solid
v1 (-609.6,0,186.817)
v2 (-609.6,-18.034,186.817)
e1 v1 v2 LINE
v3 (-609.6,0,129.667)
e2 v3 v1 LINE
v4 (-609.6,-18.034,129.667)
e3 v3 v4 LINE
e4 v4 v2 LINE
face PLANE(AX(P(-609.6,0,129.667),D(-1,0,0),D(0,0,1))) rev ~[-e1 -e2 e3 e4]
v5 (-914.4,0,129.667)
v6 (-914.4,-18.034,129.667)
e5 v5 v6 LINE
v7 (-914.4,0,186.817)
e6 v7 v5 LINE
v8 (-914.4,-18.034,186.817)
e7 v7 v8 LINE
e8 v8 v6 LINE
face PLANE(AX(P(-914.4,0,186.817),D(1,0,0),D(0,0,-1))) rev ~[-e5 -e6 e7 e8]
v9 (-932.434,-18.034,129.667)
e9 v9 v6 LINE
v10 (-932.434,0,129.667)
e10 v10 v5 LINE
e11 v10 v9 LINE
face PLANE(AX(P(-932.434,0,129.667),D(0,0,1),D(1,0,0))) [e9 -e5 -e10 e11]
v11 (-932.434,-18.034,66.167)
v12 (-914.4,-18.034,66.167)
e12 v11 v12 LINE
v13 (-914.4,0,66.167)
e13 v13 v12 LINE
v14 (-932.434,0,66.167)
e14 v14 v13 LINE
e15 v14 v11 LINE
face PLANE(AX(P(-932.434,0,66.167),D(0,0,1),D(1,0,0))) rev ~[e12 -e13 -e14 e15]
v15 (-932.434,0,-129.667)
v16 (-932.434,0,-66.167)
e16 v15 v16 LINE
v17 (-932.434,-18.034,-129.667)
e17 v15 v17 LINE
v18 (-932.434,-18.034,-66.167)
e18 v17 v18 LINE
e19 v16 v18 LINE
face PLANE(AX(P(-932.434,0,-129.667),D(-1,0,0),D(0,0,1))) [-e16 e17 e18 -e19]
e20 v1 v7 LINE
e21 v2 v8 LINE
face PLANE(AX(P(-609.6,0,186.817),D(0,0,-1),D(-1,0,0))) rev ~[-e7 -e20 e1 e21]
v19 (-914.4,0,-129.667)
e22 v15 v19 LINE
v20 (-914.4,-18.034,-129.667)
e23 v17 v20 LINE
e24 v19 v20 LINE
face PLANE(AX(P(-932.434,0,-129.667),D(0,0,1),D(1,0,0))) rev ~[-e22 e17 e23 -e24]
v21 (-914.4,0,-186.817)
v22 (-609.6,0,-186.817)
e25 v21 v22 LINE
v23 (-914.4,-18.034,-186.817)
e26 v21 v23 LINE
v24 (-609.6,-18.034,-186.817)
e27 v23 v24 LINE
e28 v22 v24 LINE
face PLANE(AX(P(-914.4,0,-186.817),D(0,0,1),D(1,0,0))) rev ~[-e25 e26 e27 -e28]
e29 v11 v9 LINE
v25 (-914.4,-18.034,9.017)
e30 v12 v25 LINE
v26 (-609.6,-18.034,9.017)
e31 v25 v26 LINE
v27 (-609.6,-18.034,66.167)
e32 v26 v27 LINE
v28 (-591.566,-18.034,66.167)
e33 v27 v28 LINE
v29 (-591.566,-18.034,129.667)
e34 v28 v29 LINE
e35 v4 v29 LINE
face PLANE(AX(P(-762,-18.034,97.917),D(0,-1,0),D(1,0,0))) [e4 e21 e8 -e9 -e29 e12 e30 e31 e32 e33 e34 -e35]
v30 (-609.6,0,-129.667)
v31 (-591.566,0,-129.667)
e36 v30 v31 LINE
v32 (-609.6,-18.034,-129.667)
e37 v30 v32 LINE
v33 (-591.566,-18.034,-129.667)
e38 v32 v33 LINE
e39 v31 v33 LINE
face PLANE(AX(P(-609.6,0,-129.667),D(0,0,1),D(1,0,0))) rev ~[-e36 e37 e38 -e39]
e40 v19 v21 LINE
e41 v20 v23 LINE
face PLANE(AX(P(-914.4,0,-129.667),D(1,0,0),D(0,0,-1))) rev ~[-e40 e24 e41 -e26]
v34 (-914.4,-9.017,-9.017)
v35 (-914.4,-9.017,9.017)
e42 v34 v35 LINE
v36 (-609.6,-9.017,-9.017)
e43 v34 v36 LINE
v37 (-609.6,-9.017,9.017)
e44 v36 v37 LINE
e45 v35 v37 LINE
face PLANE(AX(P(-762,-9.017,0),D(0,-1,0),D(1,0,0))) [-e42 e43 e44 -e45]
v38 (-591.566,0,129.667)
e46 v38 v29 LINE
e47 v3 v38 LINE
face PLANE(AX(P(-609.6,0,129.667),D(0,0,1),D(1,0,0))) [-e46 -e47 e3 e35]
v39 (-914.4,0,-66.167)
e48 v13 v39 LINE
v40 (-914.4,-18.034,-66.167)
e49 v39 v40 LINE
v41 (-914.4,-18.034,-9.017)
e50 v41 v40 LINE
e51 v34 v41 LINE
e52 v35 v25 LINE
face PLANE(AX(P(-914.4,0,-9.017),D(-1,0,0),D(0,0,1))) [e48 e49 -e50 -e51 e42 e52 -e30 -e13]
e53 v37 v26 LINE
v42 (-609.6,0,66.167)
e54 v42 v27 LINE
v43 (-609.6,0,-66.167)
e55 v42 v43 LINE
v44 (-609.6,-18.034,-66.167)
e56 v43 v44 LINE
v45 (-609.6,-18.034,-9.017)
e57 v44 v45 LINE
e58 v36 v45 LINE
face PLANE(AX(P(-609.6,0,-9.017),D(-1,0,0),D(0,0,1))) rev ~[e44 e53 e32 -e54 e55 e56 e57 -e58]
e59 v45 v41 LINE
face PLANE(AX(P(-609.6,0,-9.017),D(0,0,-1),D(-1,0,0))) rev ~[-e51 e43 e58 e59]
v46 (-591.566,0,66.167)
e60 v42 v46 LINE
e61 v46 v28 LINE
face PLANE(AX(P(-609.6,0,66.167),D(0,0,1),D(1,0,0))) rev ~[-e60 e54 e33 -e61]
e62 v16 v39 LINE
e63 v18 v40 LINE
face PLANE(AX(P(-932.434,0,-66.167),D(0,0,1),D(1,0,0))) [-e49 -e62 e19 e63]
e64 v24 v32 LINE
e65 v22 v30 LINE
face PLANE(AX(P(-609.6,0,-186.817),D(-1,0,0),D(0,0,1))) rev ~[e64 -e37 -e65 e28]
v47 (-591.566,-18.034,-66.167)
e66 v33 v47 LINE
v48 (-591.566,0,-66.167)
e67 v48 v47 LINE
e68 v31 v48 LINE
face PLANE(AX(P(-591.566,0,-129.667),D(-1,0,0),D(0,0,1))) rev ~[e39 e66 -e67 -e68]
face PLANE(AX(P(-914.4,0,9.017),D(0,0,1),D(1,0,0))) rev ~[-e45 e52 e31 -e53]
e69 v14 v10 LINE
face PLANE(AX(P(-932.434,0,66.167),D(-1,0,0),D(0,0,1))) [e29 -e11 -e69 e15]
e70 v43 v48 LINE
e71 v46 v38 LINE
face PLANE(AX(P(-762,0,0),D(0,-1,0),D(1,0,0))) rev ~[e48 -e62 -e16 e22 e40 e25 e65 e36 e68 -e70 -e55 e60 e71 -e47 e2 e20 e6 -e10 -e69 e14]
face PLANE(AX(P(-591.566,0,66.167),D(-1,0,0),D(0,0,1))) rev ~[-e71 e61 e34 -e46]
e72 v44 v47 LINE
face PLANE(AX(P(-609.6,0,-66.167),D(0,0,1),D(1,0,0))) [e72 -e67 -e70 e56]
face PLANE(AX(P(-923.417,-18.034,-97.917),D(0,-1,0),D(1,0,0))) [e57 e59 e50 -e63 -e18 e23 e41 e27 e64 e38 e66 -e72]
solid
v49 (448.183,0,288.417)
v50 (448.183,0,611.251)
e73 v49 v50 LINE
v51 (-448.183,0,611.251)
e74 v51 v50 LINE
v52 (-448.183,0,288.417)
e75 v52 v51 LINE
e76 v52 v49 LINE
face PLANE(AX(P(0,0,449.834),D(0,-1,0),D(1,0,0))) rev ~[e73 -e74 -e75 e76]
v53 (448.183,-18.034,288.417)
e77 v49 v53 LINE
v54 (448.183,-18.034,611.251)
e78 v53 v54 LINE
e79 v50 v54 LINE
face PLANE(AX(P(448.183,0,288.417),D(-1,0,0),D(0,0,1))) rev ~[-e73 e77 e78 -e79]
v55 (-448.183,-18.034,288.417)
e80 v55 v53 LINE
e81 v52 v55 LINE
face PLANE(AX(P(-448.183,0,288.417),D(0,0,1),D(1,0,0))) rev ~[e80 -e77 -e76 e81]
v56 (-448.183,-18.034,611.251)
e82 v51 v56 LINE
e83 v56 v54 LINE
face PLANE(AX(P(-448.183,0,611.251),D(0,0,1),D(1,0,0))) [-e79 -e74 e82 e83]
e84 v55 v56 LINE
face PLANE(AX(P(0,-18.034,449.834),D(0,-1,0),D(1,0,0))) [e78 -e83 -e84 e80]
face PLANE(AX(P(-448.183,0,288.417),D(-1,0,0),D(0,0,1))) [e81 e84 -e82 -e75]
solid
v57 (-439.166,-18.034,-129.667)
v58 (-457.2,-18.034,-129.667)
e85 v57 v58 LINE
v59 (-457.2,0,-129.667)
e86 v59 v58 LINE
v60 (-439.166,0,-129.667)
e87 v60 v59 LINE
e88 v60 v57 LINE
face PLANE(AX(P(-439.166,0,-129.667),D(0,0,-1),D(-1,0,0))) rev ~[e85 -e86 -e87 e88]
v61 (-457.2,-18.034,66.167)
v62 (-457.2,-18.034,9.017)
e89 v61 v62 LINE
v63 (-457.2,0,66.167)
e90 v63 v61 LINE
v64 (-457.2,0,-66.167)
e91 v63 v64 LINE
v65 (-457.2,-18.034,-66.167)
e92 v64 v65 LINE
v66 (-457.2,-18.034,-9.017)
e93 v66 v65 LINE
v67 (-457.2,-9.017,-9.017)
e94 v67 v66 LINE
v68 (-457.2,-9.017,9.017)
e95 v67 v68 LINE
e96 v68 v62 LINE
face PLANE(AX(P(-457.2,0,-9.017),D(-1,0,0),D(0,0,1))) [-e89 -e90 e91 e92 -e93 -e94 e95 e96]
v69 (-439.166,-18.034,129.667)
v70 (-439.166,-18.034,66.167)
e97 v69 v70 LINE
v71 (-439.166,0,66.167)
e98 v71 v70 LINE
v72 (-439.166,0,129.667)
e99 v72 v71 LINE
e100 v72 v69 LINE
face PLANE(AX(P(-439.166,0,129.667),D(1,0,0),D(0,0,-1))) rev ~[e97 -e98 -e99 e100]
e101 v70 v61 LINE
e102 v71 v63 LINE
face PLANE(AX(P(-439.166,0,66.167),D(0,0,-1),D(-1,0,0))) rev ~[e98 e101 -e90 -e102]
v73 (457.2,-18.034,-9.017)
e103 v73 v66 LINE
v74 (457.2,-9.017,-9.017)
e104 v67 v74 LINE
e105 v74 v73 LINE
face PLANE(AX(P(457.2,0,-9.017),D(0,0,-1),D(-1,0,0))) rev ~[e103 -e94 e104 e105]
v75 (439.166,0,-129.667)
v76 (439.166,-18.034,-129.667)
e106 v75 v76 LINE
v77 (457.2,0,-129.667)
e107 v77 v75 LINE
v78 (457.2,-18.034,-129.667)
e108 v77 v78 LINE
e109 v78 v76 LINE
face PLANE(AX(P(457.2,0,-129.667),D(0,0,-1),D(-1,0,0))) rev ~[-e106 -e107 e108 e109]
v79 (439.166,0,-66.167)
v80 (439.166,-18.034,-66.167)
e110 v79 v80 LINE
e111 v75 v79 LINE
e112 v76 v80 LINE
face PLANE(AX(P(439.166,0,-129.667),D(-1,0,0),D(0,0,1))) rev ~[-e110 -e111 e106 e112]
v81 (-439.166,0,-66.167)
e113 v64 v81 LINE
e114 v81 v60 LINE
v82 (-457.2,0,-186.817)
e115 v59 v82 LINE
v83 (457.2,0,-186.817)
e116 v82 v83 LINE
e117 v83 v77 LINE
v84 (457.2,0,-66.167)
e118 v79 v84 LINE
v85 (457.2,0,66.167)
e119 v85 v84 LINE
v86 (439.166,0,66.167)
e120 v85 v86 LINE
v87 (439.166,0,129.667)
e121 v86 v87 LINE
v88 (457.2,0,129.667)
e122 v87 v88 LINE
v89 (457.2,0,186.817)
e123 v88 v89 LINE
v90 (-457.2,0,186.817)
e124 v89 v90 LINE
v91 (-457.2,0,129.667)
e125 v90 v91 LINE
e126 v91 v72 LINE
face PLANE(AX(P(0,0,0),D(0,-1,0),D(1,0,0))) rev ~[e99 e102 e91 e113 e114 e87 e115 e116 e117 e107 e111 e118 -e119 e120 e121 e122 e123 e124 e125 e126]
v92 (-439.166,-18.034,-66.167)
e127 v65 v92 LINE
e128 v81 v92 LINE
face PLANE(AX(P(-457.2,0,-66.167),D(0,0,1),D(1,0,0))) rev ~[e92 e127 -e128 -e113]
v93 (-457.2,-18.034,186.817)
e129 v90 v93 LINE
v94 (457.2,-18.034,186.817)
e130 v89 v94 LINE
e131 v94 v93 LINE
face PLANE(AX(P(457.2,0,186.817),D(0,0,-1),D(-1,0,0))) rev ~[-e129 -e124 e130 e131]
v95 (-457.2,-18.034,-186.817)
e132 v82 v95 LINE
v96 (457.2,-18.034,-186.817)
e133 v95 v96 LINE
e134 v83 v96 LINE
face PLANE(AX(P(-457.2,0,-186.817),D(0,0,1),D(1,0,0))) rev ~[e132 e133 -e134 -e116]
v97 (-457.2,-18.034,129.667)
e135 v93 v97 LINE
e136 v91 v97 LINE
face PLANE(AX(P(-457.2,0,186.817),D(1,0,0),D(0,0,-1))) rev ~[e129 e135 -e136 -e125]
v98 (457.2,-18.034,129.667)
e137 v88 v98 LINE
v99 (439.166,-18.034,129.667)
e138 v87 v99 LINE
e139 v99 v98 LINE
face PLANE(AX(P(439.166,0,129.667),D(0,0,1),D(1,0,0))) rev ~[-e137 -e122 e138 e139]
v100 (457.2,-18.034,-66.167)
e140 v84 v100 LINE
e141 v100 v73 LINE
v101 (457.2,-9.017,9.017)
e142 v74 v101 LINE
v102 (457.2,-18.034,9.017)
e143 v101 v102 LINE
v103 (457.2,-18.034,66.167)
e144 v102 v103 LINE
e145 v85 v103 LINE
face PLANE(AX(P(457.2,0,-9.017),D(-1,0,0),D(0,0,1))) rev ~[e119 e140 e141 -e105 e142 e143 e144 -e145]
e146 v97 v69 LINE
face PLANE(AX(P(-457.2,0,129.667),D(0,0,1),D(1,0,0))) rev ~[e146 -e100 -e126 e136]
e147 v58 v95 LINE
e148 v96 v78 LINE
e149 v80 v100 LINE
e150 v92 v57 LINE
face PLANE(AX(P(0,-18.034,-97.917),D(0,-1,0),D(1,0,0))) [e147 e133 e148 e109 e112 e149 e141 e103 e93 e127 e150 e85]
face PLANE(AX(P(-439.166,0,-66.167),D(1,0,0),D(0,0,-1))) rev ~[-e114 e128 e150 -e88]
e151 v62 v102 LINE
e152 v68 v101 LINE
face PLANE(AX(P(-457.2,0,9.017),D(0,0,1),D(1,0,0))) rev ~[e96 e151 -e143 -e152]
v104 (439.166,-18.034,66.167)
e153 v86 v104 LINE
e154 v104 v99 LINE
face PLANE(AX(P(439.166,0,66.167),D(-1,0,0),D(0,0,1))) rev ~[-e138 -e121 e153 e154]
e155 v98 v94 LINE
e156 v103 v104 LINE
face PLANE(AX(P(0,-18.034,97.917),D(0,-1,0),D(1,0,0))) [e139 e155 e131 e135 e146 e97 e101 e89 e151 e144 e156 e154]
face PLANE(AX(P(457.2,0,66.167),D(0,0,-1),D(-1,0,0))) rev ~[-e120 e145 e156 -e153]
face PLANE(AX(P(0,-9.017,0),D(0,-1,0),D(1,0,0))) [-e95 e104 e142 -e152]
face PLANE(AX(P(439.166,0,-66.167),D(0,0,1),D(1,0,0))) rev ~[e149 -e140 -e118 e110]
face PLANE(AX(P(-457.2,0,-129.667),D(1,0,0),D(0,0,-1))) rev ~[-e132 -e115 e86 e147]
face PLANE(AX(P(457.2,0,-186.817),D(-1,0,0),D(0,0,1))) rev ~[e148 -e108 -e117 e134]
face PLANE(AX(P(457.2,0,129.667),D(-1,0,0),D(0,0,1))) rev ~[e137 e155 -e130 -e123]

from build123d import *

# Parameters (mm, degrees)
F1_W     = 18.034
F1_H     = 63.5
F2_DEPTH = 18.034
F1_W_2   = 896.366
F1_H_2   = 322.834
F1_W_3   = 304.8
F1_H_3   = 18.034
F3_DEPTH = 9.017
F1_W_4   = 914.4


# Not quite as in the source:
# - a variable given as a bare number and used for a length is read in inches; the dataset says mm whatever the document's units were
# - a feature names something its author has since deleted; it is built from what else it names


with BuildPart() as f2:
    # F1 (on Front) → F2 (new body)
    with BuildSketch(Plane.XZ):
        Polygon((-609.6, 129.667), (-609.6, 186.817), (-914.4, 186.817), (-914.4, 129.667), (-914.4, 66.167), (-914.4, 9.017), (-609.6, 9.017), (-609.6, 66.167), align=None)
        with Locations((-923.417, 97.917)):
            Rectangle(F1_W, F1_H)
        with Locations((-600.583, 97.917)):
            Rectangle(F1_W, F1_H)
    extrude(amount=F2_DEPTH)



with BuildPart() as f2b:
    # F1 (on Front) → F2, piece 2 (new body)
    with BuildSketch(Plane.XZ):
        with Locations((-923.417, -97.917)):
            Rectangle(F1_W, F1_H)
        with Locations((-600.583, -97.917)):
            Rectangle(F1_W, F1_H)
        Polygon((-609.6, -66.167), (-609.6, -9.017), (-914.4, -9.017), (-914.4, -66.167), (-914.4, -129.667), (-914.4, -186.817), (-609.6, -186.817), (-609.6, -129.667), align=None)
    extrude(amount=F2_DEPTH)


with BuildPart() as f2c:
    # F1 (on Front) → F2, piece 3 (new body)
    with BuildSketch(Plane.XZ):
        Polygon((457.2, -9.017), (-457.2, -9.017), (-457.2, -66.167), (-439.166, -66.167), (-439.166, -129.667), (-457.2, -129.667), (-457.2, -186.817), (457.2, -186.817), (457.2, -129.667), (439.166, -129.667), (439.166, -66.167), (457.2, -66.167), align=None)
    extrude(amount=F2_DEPTH)



with BuildPart() as f2d:
    # F1 (on Front) → F2, piece 4 (new body)
    with BuildSketch(Plane.XZ):
        Polygon((457.2, 186.817), (-457.2, 186.817), (-457.2, 129.667), (-439.166, 129.667), (-439.166, 66.167), (-457.2, 66.167), (-457.2, 9.017), (457.2, 9.017), (457.2, 66.167), (439.166, 66.167), (439.166, 129.667), (457.2, 129.667), align=None)
    extrude(amount=F2_DEPTH)


with BuildPart() as f2e:
    # F1 (on Front) → F2, piece 5 (new body)
    with BuildSketch(Plane.XZ):
        with Locations((0, 449.834)):
            Rectangle(F1_W_2, F1_H_2)
    extrude(amount=F2_DEPTH)


with BuildPart() as f2_1:
    add(f2.part)

    add(f2b.part)  # F3 merges F2b
    # F1 (on Front) → F3 (join)
    with BuildSketch(Plane.XZ):
        with Locations((-762, 0)):
            Rectangle(F1_W_3, F1_H_3)
    extrude(amount=F3_DEPTH)


with BuildPart() as f2c_1:
    add(f2c.part)

    add(f2d.part)  # F3#2 merges F2d
    # F1 (on Front) → F3, piece 2 (join)
    with BuildSketch(Plane.XZ):
        Rectangle(F1_W_4, F1_H_3)
    extrude(amount=F3_DEPTH)


solid = Compound([f2e.part, f2_1.part, f2c_1.part])
